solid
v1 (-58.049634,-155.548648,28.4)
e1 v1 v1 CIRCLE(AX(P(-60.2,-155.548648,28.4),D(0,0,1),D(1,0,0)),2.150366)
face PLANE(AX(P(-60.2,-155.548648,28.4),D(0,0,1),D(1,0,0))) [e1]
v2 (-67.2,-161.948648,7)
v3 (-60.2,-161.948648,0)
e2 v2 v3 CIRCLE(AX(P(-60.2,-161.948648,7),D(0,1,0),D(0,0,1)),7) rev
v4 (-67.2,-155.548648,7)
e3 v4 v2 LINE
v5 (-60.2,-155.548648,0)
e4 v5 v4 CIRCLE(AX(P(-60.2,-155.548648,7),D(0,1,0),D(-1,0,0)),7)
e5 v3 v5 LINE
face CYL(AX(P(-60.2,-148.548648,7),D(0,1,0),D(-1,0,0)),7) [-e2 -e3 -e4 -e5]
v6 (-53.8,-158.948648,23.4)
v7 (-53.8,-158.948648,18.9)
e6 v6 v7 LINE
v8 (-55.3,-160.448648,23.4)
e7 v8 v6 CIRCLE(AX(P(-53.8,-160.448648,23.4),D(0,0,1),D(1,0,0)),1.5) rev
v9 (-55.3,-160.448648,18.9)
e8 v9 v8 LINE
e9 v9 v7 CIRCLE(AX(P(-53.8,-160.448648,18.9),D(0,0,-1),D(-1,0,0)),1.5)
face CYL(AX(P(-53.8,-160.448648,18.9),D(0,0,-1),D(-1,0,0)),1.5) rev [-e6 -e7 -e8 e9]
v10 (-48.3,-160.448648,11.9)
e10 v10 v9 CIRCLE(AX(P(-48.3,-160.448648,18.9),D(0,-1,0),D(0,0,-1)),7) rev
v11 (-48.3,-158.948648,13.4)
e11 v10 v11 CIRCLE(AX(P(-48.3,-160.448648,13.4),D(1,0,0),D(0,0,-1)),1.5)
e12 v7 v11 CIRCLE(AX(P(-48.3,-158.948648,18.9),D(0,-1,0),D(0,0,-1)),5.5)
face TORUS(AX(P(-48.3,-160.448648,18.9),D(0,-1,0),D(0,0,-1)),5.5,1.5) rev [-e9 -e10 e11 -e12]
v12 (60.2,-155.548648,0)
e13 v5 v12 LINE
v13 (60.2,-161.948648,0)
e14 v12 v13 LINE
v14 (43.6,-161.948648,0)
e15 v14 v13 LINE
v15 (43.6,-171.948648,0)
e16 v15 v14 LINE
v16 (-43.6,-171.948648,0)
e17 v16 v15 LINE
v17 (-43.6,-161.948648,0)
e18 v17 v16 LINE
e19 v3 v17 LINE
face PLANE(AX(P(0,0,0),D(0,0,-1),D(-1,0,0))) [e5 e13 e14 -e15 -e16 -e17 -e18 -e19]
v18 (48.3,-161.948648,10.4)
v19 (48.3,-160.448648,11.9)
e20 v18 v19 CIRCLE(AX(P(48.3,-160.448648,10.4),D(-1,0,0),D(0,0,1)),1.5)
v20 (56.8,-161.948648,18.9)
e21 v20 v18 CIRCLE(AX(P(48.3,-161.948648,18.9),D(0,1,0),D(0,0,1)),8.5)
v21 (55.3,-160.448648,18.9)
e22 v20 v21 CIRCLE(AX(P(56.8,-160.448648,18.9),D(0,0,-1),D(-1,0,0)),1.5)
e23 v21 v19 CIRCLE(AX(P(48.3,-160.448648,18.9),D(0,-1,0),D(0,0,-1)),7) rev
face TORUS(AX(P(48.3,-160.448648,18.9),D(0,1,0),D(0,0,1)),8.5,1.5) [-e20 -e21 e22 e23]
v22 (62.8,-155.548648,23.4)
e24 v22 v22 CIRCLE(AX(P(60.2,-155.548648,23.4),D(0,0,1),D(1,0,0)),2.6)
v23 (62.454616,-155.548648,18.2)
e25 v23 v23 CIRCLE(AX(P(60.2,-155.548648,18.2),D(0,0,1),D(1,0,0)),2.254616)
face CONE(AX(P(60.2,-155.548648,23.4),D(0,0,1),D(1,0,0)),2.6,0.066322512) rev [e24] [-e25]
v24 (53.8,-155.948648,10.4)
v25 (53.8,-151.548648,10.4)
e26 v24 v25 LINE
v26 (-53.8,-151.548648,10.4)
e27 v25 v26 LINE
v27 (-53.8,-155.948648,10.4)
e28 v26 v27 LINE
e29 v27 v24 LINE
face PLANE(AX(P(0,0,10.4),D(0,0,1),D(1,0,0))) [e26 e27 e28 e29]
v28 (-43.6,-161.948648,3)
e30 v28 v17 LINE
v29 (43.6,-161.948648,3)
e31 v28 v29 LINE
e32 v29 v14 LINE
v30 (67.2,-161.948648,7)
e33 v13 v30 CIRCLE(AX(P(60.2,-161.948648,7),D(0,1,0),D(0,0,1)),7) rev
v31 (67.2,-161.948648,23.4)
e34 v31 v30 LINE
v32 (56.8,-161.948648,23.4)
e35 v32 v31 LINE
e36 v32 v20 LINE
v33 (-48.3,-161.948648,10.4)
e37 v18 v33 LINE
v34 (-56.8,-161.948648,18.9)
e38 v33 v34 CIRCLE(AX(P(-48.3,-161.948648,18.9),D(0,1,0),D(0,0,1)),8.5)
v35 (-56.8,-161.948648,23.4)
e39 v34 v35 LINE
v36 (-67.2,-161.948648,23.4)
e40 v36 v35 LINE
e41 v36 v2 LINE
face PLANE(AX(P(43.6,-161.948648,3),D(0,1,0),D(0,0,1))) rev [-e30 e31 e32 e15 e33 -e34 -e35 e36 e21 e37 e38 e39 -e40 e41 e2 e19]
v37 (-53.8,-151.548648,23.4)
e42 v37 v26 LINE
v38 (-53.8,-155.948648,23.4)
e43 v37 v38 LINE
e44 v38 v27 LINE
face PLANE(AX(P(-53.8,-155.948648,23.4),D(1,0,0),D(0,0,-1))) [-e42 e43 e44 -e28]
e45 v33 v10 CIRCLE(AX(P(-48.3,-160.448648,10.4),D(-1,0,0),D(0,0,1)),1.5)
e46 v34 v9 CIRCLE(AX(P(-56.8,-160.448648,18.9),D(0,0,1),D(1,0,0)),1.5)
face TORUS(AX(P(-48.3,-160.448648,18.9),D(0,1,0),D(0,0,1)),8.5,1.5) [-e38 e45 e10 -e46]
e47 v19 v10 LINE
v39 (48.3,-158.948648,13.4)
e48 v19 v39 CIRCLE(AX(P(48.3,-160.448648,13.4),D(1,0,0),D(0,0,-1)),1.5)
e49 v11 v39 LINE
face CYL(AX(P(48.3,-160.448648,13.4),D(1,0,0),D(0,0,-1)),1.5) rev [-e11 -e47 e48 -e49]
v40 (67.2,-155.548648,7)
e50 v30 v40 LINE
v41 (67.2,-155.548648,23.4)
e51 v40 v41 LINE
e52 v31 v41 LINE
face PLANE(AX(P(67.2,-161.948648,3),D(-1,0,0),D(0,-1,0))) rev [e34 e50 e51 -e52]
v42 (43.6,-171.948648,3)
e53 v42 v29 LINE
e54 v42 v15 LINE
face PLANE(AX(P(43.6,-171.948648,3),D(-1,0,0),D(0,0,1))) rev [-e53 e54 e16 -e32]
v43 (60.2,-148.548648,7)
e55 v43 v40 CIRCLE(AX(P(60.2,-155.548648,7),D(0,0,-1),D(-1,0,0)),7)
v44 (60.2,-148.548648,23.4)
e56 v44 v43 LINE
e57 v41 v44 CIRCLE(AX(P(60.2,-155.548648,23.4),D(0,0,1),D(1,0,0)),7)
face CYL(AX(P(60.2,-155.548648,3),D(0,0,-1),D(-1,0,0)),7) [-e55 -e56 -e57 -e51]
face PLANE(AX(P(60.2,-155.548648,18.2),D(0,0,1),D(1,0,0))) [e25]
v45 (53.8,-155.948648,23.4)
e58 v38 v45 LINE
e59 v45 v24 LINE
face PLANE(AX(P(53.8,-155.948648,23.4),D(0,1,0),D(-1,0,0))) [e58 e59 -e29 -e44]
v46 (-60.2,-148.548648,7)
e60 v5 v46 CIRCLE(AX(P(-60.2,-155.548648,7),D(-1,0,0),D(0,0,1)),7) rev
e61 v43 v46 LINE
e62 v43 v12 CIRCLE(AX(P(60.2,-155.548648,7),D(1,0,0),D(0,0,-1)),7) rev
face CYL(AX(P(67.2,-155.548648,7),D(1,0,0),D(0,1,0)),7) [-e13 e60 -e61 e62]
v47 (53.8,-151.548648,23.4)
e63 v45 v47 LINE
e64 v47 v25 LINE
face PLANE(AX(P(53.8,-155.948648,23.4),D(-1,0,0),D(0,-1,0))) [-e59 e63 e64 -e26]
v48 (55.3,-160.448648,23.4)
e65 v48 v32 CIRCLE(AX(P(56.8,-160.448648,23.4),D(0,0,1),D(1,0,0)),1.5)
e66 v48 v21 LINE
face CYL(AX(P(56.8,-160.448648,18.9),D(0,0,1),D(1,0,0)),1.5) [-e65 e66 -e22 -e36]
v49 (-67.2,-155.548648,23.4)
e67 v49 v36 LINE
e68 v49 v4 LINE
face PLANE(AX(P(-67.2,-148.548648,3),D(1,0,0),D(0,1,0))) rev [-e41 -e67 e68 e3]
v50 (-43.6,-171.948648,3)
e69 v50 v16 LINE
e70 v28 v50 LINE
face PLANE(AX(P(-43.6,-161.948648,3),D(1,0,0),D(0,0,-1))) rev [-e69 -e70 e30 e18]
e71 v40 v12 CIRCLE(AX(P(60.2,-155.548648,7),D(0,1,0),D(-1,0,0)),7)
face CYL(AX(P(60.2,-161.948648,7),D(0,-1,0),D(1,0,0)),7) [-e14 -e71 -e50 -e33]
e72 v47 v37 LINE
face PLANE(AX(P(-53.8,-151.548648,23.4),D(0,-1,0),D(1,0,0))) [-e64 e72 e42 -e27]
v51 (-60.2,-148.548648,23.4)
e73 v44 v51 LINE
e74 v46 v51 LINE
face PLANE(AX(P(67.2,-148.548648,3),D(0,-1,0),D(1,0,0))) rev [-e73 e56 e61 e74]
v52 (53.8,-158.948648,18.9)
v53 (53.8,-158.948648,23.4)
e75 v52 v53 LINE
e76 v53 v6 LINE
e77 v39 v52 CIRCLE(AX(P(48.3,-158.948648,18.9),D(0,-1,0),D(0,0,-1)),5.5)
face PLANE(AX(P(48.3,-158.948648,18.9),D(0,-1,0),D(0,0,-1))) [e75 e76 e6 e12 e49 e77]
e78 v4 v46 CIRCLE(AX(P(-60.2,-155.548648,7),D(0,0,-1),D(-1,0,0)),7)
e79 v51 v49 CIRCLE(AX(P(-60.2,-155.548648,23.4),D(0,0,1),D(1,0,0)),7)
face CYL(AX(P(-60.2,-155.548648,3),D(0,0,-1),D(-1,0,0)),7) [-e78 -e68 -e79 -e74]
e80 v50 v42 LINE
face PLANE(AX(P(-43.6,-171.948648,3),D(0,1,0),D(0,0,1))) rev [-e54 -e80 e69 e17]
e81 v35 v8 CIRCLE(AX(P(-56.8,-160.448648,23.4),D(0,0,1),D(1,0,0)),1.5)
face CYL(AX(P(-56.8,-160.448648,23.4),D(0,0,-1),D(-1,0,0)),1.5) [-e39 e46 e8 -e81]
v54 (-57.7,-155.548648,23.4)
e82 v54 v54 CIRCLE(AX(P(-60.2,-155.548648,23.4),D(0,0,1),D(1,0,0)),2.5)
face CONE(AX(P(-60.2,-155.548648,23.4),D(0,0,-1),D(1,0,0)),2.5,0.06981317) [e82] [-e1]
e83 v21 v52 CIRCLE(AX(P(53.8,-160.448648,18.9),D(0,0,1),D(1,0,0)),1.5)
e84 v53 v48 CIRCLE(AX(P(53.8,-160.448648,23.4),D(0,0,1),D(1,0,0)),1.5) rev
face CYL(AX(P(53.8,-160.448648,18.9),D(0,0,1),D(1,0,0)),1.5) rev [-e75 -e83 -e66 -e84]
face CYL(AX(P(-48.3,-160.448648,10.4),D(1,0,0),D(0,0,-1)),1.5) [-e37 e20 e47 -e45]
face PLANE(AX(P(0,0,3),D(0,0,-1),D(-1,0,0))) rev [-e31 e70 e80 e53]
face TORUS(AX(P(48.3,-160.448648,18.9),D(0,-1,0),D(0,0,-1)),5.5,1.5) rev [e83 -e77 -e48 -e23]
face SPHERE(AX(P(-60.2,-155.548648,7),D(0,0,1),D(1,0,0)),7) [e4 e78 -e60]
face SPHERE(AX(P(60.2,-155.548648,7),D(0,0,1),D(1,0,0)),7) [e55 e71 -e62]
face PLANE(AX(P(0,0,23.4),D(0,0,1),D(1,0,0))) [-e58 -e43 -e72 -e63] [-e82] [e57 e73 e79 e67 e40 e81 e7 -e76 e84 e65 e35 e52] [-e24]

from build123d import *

# Parameters (mm, degrees)
EXTRUDE1_DEPTH     = 3
SKETCH3_W          = 134.4
SKETCH3_H          = 13.4
EXTRUDE2_DEPTH     = 7.4
SKETCH4_W          = 134.4
SKETCH4_H          = 13.4
SKETCH4_W_2        = 107.6
SKETCH4_H_2        = 4.4
EXTRUDE3_DEPTH     = 13
FILLET1_R          = 7
CUT_EXTRUDE1_DEPTH = 3
FILLET2_R          = 1.5
SKETCH7_R          = 2.5
EXTRUDE4_DEPTH     = 5
EXTRUDE4_TAPER     = 4
SKETCH8_R          = 2.6
CUT_EXTRUDE2_DEPTH = 5.2
CUT_EXTRUDE2_DRAFT = -3.8


with BuildPart() as part:
    # Sketch1 → Extrude1 (new body)
    with BuildSketch(Plane.XY):
        Polygon((-43.6, -161.948648405), (-43.6, -171.948648405), (43.6, -171.948648405), (43.6, -161.948648405), (67.2, -161.948648405), (67.2, -148.548648405), (-67.2, -148.548648405), (-67.2, -161.948648405), align=None)
    extrude(amount=EXTRUDE1_DEPTH)

    # Sketch3 → Extrude2 (add)
    with BuildSketch(Plane.XY.offset(3)):
        with Locations((0, -155.248648405)):
            Rectangle(SKETCH3_W, SKETCH3_H)
    extrude(amount=EXTRUDE2_DEPTH)

    # Sketch4 → Extrude3 (add)
    with BuildSketch(Plane.XY.offset(10.4)):
        with Locations((0, -155.248648405)):
            Rectangle(SKETCH4_W, SKETCH4_H)
        with Locations((0, -153.748648405)):
            Rectangle(SKETCH4_W_2, SKETCH4_H_2, mode=Mode.SUBTRACT)
    extrude(amount=EXTRUDE3_DEPTH)

    # Fillet1
    fillet1_edges = [part.edges().sort_by_distance(p)[0] for p in [
        (-67.2, -148.548648405, 11.7),
        (67.2, -148.548648405, 11.7),
        (-67.2, -155.248648405, 0),
        (0, -148.548648405, 0),
        (67.2, -155.248648405, 0),
    ]]
    fillet(fillet1_edges, radius=FILLET1_R)

    # Sketch6 → Cut-Extrude1 (cut)
    with BuildSketch(Plane.XZ.offset(161.948648405)):
        with BuildLine():
            Line((-55.3, 23.4), (-55.3, 18.9))
            ThreePointArc((-55.3, 18.9), (-53.249747468, 13.950252532), (-48.3, 11.9))
            Line((-48.3, 11.9), (48.3, 11.9))
            ThreePointArc((48.3, 11.9), (53.249747468, 13.950252532), (55.3, 18.9))
            Line((55.3, 18.9), (55.3, 23.4))
            Line((55.3, 23.4), (-55.3, 23.4))
        make_face()
    extrude(amount=-CUT_EXTRUDE1_DEPTH, mode=Mode.SUBTRACT)

    # Fillet2
    fillet2_edges = [part.edges().sort_by_distance(p)[0] for p in [
        (55.3, -158.948648405, 21.15),
        (53.249747468, -158.948648405, 13.950252532),
        (0, -158.948648405, 11.9),
        (-53.249747468, -158.948648405, 13.950252532),
        (-55.3, -158.948648405, 21.15),
        (-55.3, -161.948648405, 21.15),
        (-53.249747468, -161.948648405, 13.950252532),
        (55.3, -161.948648405, 21.15),
        (53.249747468, -161.948648405, 13.950252532),
        (0, -161.948648405, 11.9),
    ]]
    fillet(fillet2_edges, radius=FILLET2_R - 0.0001)  # a hair under: the kernel refuses the full size

    # Sketch7 → Extrude4 (add)
    with BuildSketch(Plane.XY.offset(23.4)):
        with Locations((-60.2, -155.548648405)):
            Circle(SKETCH7_R)
    extrude(amount=EXTRUDE4_DEPTH, taper=EXTRUDE4_TAPER)


with BuildPart() as cut_extrude2_tool:
    # Sketch8 → Cut-Extrude2 (with draft: the straight prism first)
    with BuildSketch(Plane.XY.offset(23.4)):
        with Locations((60.2, -155.548648405)):
            Circle(SKETCH8_R)
    extrude(amount=-CUT_EXTRUDE2_DEPTH)
    # Cut-Extrude2: the draft: its side faces are tilted about the plane it starts from
    cut_extrude2_sides = [cut_extrude2_tool.faces().sort_by_distance(p)[0] for p in [
        (57.6, -155.548648405, 20.8),
    ]]
    draft(cut_extrude2_sides, Plane.XY.offset(23.4), CUT_EXTRUDE2_DRAFT)


with BuildPart() as part_1:
    add(part.part)

    # Cut-Extrude2: cut by cut_extrude2_tool
    add(cut_extrude2_tool.part, mode=Mode.SUBTRACT)


solid = part_1.part
